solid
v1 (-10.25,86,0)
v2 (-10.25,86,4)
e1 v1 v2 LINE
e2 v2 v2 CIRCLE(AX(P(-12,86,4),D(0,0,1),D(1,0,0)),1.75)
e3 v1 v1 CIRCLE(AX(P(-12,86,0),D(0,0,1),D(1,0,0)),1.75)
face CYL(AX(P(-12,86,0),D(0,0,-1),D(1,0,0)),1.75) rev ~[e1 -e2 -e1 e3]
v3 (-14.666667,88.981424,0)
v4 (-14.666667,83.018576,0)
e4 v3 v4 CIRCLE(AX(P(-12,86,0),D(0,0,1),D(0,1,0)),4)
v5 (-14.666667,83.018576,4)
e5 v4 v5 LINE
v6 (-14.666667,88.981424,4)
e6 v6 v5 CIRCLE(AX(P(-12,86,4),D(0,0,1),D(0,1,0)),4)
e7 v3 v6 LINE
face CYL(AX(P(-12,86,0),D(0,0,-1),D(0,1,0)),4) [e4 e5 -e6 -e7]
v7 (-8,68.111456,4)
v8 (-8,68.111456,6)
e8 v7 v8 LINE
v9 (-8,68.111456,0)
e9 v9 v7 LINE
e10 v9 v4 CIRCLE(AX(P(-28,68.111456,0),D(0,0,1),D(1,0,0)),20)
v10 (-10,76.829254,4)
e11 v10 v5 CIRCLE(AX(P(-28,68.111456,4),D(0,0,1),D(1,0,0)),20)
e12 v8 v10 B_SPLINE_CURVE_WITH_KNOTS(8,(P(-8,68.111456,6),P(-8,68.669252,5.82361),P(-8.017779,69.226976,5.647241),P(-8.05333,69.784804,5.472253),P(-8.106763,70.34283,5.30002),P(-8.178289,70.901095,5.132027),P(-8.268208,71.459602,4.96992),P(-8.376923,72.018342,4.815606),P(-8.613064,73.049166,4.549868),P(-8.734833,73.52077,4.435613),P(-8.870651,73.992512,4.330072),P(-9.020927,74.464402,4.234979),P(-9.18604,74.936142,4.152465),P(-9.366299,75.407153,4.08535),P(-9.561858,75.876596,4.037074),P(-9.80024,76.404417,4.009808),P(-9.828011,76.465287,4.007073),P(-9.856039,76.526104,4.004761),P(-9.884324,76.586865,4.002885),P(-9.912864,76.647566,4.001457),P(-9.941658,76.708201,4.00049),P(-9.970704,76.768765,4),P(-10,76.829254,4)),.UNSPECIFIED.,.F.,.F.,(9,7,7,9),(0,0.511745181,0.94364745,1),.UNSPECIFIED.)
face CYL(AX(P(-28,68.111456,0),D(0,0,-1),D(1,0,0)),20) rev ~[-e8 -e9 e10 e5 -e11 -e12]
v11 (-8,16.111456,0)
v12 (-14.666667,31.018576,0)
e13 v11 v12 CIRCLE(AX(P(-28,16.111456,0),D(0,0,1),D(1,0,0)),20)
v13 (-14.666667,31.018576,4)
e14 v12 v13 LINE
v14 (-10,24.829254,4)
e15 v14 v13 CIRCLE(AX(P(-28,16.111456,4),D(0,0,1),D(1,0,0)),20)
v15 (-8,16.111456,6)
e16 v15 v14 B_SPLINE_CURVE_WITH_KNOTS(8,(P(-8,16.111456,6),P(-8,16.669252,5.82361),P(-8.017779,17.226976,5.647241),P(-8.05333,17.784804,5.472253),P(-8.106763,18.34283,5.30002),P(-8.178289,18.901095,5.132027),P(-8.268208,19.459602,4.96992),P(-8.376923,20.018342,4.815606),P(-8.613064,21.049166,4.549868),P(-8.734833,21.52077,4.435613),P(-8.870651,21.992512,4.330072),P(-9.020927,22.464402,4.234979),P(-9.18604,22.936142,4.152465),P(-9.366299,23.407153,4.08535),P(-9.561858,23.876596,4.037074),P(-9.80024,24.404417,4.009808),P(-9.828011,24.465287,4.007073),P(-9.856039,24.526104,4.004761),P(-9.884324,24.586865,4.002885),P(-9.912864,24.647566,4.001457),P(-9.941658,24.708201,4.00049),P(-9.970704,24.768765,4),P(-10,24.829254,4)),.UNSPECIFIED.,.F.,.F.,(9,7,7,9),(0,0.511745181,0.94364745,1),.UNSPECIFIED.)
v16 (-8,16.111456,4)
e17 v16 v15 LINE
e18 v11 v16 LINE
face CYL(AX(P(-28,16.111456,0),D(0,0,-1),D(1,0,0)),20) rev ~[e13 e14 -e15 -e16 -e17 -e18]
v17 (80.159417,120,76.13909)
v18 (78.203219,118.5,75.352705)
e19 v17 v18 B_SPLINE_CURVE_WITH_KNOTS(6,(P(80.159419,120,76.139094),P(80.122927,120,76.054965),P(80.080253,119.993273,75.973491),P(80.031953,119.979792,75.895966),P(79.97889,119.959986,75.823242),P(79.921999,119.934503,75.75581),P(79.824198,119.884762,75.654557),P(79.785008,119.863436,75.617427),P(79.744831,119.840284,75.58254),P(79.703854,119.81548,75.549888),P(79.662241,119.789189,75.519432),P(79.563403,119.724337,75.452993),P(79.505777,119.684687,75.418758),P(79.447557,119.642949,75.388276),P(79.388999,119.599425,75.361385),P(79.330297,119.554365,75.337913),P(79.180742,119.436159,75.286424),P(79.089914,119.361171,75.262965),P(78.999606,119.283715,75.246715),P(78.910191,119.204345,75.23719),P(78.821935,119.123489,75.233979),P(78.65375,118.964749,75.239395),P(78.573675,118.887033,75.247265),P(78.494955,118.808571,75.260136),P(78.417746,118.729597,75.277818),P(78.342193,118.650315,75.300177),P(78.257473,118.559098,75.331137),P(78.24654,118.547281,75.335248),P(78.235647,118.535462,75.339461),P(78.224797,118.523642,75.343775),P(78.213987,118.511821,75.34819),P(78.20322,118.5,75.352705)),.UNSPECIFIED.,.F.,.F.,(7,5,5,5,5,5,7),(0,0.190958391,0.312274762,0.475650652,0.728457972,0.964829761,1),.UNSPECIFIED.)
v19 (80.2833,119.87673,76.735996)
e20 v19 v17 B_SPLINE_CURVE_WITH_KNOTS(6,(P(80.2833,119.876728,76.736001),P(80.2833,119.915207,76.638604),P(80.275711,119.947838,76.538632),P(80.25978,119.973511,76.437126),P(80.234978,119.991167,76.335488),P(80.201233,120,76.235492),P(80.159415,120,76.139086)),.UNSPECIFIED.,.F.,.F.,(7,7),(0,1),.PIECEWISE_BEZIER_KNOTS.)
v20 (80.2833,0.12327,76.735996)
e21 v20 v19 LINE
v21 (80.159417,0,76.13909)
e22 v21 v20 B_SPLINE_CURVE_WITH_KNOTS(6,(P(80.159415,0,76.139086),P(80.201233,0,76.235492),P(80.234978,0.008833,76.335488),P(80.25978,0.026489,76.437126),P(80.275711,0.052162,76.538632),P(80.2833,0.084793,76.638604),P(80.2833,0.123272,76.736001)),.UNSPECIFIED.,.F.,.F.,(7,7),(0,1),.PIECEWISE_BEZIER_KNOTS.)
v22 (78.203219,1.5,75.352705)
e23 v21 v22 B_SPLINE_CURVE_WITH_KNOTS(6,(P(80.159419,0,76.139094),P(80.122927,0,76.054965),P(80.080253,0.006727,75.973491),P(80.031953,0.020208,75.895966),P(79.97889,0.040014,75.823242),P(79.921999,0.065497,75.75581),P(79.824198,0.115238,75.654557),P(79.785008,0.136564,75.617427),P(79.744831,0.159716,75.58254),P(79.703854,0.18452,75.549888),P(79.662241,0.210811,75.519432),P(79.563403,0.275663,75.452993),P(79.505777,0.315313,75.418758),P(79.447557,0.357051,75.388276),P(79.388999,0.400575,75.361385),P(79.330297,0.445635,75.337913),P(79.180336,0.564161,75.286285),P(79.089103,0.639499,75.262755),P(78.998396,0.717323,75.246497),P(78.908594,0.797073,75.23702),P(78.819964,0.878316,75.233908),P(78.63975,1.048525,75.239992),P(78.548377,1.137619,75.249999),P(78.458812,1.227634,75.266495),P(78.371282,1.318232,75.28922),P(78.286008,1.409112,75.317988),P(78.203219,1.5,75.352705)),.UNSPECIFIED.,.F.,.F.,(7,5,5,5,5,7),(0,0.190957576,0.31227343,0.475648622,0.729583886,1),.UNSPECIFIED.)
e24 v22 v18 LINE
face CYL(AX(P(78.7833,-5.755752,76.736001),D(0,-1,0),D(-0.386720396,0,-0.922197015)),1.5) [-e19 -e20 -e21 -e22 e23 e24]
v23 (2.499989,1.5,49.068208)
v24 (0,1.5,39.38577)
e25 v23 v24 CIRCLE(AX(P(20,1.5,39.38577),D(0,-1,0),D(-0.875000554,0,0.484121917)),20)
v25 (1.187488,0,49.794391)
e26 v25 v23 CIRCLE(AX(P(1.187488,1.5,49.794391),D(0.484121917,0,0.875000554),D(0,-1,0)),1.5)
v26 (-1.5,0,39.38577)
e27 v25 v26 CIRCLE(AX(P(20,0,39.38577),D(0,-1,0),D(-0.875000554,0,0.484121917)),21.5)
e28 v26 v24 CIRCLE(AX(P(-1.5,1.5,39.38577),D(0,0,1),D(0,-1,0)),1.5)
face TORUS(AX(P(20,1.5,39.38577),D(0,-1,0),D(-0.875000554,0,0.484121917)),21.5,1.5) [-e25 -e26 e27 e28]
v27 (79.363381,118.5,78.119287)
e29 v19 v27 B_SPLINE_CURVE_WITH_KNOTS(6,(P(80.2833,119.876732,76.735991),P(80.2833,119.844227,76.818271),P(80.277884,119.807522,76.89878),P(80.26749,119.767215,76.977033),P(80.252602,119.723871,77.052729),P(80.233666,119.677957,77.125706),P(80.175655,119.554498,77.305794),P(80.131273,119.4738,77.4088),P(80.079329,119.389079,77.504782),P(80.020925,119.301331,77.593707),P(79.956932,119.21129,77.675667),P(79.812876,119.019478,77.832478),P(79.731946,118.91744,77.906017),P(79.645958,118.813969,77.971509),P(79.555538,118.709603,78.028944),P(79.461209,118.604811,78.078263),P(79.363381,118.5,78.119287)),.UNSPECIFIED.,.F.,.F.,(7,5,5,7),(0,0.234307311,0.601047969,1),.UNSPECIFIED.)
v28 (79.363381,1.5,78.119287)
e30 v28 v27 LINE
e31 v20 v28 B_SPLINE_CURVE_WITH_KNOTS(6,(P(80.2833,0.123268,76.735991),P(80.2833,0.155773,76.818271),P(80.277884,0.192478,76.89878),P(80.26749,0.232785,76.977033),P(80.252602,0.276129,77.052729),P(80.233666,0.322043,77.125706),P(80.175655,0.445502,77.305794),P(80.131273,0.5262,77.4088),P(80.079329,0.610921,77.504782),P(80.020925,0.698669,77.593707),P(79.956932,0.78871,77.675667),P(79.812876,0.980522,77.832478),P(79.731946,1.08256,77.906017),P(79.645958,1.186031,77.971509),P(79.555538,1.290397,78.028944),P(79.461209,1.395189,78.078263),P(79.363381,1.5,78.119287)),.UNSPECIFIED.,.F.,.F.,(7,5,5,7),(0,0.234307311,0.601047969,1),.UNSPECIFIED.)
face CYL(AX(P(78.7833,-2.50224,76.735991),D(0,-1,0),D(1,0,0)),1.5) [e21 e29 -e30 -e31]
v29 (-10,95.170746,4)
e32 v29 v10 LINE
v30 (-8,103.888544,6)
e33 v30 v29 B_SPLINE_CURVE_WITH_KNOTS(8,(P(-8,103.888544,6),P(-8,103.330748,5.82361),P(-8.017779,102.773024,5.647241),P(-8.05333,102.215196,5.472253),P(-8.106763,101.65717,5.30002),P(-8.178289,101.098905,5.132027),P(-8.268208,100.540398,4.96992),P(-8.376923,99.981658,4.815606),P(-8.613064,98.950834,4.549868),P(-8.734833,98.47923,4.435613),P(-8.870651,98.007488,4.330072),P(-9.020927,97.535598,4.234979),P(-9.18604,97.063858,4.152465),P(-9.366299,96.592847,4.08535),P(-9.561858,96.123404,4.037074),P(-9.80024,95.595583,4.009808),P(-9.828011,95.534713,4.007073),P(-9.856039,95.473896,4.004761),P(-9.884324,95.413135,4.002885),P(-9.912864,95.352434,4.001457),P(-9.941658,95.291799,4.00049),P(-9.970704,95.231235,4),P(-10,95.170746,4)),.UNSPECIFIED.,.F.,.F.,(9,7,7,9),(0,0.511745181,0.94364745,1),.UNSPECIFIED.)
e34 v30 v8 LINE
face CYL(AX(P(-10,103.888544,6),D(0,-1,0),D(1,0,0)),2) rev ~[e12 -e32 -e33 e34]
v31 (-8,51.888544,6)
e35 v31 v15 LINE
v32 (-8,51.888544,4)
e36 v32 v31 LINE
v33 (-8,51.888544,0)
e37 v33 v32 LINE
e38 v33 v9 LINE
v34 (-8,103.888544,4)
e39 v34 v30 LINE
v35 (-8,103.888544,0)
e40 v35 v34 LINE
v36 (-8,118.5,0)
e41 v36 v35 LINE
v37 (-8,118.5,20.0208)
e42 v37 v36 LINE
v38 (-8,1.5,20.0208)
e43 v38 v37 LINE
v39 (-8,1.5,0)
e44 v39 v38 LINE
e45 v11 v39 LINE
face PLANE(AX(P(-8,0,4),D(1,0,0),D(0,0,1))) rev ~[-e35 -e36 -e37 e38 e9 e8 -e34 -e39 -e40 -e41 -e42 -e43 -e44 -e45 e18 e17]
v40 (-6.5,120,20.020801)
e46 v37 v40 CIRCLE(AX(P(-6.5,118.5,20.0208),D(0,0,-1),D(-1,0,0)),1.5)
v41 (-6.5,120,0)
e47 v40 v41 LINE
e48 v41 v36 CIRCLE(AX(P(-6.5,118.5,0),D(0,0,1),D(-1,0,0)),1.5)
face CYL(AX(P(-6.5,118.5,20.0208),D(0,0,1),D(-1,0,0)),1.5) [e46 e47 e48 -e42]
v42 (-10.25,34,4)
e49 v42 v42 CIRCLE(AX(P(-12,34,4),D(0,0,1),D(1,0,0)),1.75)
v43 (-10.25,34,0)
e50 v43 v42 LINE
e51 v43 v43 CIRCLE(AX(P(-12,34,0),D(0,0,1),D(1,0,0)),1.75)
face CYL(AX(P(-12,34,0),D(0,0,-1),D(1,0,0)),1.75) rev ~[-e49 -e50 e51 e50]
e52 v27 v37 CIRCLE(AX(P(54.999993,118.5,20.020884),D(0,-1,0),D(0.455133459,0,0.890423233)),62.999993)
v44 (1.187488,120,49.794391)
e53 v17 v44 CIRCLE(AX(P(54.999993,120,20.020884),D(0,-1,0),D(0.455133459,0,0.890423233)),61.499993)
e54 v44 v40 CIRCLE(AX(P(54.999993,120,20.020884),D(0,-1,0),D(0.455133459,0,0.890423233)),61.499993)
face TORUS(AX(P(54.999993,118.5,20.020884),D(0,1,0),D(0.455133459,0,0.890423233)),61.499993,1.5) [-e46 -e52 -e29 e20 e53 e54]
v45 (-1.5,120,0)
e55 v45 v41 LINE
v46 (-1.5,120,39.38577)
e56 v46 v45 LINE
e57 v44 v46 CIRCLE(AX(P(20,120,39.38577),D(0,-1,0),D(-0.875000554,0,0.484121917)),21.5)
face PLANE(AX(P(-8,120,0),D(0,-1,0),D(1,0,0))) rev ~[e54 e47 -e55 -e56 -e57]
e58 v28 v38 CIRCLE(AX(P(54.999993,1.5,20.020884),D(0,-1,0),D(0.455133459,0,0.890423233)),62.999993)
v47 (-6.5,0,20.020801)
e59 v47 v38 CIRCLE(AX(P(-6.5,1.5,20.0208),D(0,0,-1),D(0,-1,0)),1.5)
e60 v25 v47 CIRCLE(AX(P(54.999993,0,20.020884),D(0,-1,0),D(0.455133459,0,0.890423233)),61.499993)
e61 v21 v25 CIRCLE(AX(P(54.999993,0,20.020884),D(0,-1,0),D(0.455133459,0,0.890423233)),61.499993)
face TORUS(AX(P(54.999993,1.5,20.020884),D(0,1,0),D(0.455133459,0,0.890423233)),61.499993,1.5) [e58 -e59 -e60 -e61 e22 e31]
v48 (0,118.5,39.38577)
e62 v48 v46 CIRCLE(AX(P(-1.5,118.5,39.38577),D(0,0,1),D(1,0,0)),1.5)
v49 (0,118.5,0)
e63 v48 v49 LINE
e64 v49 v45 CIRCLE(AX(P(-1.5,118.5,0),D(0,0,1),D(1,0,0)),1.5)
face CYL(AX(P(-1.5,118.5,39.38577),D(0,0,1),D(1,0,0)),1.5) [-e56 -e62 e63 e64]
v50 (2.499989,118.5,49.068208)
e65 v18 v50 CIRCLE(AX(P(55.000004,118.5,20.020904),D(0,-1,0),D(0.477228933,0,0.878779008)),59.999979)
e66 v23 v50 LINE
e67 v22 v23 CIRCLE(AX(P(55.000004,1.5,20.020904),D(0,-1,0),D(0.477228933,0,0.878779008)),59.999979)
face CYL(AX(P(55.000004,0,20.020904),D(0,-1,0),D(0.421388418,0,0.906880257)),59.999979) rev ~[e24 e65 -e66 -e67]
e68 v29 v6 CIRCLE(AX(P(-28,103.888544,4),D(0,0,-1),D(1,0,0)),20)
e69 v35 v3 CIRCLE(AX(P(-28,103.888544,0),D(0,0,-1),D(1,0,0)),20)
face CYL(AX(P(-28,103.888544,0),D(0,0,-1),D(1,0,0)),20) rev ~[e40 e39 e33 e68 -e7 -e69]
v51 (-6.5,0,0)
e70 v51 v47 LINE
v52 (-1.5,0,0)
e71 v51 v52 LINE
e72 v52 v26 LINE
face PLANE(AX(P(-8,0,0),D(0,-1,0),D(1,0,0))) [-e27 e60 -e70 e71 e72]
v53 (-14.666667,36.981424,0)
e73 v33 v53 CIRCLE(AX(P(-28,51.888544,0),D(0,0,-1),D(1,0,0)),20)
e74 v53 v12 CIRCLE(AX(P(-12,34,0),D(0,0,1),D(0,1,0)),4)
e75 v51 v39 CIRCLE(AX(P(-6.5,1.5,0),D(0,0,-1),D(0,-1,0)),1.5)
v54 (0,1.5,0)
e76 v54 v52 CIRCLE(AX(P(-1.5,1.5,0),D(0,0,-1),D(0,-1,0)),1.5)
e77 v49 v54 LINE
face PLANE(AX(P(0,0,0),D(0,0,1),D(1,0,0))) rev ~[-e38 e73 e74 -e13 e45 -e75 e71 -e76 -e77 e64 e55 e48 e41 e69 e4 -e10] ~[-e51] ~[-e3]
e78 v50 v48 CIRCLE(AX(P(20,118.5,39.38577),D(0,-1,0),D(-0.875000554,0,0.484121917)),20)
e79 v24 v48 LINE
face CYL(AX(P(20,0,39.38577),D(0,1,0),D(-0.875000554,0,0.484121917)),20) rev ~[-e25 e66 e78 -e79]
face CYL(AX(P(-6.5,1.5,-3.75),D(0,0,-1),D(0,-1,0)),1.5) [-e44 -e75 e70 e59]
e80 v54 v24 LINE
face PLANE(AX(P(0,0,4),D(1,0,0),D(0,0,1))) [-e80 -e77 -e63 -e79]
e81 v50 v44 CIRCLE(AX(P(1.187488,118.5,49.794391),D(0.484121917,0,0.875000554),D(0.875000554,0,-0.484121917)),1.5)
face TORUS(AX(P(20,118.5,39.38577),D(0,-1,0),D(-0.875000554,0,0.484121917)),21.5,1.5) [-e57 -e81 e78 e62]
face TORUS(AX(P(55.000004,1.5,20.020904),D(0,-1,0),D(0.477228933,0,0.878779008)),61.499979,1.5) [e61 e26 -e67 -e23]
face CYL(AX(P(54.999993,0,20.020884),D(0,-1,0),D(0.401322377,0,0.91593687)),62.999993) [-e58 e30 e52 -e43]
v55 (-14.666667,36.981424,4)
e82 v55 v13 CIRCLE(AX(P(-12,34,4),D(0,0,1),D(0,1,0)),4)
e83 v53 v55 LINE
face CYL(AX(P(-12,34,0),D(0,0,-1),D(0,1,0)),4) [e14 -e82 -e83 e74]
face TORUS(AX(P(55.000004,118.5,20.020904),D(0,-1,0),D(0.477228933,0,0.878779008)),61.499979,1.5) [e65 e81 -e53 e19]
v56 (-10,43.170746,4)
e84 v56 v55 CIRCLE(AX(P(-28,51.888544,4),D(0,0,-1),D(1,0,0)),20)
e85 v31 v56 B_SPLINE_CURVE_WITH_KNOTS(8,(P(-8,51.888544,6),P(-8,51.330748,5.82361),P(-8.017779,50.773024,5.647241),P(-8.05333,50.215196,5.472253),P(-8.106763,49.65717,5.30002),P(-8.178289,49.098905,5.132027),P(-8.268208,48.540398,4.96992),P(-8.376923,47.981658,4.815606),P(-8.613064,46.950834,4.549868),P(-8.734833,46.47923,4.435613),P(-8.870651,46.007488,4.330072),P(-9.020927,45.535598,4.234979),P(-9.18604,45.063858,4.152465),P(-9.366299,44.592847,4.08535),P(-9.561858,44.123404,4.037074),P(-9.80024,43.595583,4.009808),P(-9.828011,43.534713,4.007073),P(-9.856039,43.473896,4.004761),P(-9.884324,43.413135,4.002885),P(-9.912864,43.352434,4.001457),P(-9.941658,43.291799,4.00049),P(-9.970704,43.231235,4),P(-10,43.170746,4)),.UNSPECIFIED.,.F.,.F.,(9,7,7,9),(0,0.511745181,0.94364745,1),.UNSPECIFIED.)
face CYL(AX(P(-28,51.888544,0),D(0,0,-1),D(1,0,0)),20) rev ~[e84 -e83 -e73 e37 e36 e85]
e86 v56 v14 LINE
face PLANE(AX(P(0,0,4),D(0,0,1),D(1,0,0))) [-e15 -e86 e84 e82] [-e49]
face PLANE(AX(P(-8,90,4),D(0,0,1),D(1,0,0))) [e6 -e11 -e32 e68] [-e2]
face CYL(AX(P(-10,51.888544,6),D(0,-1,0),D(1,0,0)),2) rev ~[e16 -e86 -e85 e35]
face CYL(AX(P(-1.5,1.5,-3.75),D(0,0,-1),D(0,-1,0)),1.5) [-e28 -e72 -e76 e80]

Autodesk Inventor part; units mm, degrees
ref_plane "YZ Plane" through (0, 0, 0) normal (1, 0, 0) x (0, 1, 0)
ref_plane "XZ Plane" through (0, 0, 0) normal (0, 1, 0) x (-1, 0, 0)
ref_plane "XY Plane" through (0, 0, 0) normal (0, 0, 1) x (1, 0, 0)
sketch "Sketch1" plane through (0, 0, 0) normal (0, 0, 1) x (1, 0, 0)
  line L0 (-8, 0) -> (0, 0)
  line L1 (0, 0) -> (0, 120)
  line L2 (0, 120) -> (-8, 120)
  line L3 (-8, 120) -> (-8, 0)
  line L4 (0, 34) -> (-16, 34) construction
  line L5 (-8, 30) -> (-12, 30)
  line L6 (-12, 38) -> (-8, 38)
  arc A0 (-12, 38) -> (-12, 30) centre (-12, 34) ccw
  line L7 (0, 86) -> (-16, 86) construction
  line L8 (-8, 82) -> (-12, 82)
  line L9 (-12, 90) -> (-8, 90)
  arc A1 (-12, 90) -> (-12, 82) centre (-12, 86) ccw
  circle A2 centre (-12, 34) radius 1.75
  circle A3 centre (-12, 86) radius 1.75
  line L10 (0, 60) -> (-8, 60)
  point P0 (-8, 34)
  point P1 (-8, 86)
  dimension "d0" = 8
  dimension "d1" = 120
  dimension "d2" = 52
  dimension "d3" = 3.5
  dimension "d4" = 3.5
  dimension "d5" = 4
  dimension "d6" = 4
  dimension "d7" = 4
extrude "Extrusion1" add sketch "Sketch1" along normal blind 4
sketch "Sketch2" plane through (-8, 0, 0) normal (0, -1, 0) x (1, 0, 0)
  line L0 (0, 0) -> (8, 0) projected
  line L1 (8, 0) -> (8, 4) projected
  line L2 (0, 4) -> (8, 4) projected
  line L3 (0, 0) -> (0, 4) projected
  line L4 (8, 4) -> (8, 44)
  arc A0 (88.2833, 74.4337) -> (8, 44) centre (63, 20.0208) ccw
  arc A1 (88.2833, 77.7249) -> (0, 20.0208) centre (63, 20.0208) ccw
  line L5 (88.2833, 77.7249) -> (88.2833, 74.4337)
  line L6 (0, 4) -> (0, 20.0208)
  dimension "d10" = 40
  dimension "d11" = 60
  dimension "d20" = 63
  dimension "d22" = 3.2912
extrude "Extrusion2" add sketch "Sketch2" against normal up to surface (120 mm away) from surface at 0 contours L6 A1 L5 A0 L4 L2
fillet "Fillet1" radius 20 1 edges at (0, 60, 44)
fillet "Fillet2" radius 20 4 edges at (-8, 38, 2) (-8, 90, 2) (-8, 82, 2) (-8, 30, 2)
fillet "Fillet3" radius 1.5 12 edges at (-8, 120, 10.0104) (20.5315, 120, 72.7553) (0.6351, 120, 44.3858) (0, 120, 19.6929) (36.3979, 120, 77.0643) (80.2833, 60, 77.7249) (80.2833, 60, 74.4337) (-8, 0, 10.0104) (20.5315, 0, 72.7553) (0.6351, 0, 44.3858) (0, 0, 19.6929) (36.3979, 0, 77.0643)
fillet "Fillet4" radius 2 2 edges at (-8, 34, 4) (-8, 86, 4)
properties part number "tunel.viento"
